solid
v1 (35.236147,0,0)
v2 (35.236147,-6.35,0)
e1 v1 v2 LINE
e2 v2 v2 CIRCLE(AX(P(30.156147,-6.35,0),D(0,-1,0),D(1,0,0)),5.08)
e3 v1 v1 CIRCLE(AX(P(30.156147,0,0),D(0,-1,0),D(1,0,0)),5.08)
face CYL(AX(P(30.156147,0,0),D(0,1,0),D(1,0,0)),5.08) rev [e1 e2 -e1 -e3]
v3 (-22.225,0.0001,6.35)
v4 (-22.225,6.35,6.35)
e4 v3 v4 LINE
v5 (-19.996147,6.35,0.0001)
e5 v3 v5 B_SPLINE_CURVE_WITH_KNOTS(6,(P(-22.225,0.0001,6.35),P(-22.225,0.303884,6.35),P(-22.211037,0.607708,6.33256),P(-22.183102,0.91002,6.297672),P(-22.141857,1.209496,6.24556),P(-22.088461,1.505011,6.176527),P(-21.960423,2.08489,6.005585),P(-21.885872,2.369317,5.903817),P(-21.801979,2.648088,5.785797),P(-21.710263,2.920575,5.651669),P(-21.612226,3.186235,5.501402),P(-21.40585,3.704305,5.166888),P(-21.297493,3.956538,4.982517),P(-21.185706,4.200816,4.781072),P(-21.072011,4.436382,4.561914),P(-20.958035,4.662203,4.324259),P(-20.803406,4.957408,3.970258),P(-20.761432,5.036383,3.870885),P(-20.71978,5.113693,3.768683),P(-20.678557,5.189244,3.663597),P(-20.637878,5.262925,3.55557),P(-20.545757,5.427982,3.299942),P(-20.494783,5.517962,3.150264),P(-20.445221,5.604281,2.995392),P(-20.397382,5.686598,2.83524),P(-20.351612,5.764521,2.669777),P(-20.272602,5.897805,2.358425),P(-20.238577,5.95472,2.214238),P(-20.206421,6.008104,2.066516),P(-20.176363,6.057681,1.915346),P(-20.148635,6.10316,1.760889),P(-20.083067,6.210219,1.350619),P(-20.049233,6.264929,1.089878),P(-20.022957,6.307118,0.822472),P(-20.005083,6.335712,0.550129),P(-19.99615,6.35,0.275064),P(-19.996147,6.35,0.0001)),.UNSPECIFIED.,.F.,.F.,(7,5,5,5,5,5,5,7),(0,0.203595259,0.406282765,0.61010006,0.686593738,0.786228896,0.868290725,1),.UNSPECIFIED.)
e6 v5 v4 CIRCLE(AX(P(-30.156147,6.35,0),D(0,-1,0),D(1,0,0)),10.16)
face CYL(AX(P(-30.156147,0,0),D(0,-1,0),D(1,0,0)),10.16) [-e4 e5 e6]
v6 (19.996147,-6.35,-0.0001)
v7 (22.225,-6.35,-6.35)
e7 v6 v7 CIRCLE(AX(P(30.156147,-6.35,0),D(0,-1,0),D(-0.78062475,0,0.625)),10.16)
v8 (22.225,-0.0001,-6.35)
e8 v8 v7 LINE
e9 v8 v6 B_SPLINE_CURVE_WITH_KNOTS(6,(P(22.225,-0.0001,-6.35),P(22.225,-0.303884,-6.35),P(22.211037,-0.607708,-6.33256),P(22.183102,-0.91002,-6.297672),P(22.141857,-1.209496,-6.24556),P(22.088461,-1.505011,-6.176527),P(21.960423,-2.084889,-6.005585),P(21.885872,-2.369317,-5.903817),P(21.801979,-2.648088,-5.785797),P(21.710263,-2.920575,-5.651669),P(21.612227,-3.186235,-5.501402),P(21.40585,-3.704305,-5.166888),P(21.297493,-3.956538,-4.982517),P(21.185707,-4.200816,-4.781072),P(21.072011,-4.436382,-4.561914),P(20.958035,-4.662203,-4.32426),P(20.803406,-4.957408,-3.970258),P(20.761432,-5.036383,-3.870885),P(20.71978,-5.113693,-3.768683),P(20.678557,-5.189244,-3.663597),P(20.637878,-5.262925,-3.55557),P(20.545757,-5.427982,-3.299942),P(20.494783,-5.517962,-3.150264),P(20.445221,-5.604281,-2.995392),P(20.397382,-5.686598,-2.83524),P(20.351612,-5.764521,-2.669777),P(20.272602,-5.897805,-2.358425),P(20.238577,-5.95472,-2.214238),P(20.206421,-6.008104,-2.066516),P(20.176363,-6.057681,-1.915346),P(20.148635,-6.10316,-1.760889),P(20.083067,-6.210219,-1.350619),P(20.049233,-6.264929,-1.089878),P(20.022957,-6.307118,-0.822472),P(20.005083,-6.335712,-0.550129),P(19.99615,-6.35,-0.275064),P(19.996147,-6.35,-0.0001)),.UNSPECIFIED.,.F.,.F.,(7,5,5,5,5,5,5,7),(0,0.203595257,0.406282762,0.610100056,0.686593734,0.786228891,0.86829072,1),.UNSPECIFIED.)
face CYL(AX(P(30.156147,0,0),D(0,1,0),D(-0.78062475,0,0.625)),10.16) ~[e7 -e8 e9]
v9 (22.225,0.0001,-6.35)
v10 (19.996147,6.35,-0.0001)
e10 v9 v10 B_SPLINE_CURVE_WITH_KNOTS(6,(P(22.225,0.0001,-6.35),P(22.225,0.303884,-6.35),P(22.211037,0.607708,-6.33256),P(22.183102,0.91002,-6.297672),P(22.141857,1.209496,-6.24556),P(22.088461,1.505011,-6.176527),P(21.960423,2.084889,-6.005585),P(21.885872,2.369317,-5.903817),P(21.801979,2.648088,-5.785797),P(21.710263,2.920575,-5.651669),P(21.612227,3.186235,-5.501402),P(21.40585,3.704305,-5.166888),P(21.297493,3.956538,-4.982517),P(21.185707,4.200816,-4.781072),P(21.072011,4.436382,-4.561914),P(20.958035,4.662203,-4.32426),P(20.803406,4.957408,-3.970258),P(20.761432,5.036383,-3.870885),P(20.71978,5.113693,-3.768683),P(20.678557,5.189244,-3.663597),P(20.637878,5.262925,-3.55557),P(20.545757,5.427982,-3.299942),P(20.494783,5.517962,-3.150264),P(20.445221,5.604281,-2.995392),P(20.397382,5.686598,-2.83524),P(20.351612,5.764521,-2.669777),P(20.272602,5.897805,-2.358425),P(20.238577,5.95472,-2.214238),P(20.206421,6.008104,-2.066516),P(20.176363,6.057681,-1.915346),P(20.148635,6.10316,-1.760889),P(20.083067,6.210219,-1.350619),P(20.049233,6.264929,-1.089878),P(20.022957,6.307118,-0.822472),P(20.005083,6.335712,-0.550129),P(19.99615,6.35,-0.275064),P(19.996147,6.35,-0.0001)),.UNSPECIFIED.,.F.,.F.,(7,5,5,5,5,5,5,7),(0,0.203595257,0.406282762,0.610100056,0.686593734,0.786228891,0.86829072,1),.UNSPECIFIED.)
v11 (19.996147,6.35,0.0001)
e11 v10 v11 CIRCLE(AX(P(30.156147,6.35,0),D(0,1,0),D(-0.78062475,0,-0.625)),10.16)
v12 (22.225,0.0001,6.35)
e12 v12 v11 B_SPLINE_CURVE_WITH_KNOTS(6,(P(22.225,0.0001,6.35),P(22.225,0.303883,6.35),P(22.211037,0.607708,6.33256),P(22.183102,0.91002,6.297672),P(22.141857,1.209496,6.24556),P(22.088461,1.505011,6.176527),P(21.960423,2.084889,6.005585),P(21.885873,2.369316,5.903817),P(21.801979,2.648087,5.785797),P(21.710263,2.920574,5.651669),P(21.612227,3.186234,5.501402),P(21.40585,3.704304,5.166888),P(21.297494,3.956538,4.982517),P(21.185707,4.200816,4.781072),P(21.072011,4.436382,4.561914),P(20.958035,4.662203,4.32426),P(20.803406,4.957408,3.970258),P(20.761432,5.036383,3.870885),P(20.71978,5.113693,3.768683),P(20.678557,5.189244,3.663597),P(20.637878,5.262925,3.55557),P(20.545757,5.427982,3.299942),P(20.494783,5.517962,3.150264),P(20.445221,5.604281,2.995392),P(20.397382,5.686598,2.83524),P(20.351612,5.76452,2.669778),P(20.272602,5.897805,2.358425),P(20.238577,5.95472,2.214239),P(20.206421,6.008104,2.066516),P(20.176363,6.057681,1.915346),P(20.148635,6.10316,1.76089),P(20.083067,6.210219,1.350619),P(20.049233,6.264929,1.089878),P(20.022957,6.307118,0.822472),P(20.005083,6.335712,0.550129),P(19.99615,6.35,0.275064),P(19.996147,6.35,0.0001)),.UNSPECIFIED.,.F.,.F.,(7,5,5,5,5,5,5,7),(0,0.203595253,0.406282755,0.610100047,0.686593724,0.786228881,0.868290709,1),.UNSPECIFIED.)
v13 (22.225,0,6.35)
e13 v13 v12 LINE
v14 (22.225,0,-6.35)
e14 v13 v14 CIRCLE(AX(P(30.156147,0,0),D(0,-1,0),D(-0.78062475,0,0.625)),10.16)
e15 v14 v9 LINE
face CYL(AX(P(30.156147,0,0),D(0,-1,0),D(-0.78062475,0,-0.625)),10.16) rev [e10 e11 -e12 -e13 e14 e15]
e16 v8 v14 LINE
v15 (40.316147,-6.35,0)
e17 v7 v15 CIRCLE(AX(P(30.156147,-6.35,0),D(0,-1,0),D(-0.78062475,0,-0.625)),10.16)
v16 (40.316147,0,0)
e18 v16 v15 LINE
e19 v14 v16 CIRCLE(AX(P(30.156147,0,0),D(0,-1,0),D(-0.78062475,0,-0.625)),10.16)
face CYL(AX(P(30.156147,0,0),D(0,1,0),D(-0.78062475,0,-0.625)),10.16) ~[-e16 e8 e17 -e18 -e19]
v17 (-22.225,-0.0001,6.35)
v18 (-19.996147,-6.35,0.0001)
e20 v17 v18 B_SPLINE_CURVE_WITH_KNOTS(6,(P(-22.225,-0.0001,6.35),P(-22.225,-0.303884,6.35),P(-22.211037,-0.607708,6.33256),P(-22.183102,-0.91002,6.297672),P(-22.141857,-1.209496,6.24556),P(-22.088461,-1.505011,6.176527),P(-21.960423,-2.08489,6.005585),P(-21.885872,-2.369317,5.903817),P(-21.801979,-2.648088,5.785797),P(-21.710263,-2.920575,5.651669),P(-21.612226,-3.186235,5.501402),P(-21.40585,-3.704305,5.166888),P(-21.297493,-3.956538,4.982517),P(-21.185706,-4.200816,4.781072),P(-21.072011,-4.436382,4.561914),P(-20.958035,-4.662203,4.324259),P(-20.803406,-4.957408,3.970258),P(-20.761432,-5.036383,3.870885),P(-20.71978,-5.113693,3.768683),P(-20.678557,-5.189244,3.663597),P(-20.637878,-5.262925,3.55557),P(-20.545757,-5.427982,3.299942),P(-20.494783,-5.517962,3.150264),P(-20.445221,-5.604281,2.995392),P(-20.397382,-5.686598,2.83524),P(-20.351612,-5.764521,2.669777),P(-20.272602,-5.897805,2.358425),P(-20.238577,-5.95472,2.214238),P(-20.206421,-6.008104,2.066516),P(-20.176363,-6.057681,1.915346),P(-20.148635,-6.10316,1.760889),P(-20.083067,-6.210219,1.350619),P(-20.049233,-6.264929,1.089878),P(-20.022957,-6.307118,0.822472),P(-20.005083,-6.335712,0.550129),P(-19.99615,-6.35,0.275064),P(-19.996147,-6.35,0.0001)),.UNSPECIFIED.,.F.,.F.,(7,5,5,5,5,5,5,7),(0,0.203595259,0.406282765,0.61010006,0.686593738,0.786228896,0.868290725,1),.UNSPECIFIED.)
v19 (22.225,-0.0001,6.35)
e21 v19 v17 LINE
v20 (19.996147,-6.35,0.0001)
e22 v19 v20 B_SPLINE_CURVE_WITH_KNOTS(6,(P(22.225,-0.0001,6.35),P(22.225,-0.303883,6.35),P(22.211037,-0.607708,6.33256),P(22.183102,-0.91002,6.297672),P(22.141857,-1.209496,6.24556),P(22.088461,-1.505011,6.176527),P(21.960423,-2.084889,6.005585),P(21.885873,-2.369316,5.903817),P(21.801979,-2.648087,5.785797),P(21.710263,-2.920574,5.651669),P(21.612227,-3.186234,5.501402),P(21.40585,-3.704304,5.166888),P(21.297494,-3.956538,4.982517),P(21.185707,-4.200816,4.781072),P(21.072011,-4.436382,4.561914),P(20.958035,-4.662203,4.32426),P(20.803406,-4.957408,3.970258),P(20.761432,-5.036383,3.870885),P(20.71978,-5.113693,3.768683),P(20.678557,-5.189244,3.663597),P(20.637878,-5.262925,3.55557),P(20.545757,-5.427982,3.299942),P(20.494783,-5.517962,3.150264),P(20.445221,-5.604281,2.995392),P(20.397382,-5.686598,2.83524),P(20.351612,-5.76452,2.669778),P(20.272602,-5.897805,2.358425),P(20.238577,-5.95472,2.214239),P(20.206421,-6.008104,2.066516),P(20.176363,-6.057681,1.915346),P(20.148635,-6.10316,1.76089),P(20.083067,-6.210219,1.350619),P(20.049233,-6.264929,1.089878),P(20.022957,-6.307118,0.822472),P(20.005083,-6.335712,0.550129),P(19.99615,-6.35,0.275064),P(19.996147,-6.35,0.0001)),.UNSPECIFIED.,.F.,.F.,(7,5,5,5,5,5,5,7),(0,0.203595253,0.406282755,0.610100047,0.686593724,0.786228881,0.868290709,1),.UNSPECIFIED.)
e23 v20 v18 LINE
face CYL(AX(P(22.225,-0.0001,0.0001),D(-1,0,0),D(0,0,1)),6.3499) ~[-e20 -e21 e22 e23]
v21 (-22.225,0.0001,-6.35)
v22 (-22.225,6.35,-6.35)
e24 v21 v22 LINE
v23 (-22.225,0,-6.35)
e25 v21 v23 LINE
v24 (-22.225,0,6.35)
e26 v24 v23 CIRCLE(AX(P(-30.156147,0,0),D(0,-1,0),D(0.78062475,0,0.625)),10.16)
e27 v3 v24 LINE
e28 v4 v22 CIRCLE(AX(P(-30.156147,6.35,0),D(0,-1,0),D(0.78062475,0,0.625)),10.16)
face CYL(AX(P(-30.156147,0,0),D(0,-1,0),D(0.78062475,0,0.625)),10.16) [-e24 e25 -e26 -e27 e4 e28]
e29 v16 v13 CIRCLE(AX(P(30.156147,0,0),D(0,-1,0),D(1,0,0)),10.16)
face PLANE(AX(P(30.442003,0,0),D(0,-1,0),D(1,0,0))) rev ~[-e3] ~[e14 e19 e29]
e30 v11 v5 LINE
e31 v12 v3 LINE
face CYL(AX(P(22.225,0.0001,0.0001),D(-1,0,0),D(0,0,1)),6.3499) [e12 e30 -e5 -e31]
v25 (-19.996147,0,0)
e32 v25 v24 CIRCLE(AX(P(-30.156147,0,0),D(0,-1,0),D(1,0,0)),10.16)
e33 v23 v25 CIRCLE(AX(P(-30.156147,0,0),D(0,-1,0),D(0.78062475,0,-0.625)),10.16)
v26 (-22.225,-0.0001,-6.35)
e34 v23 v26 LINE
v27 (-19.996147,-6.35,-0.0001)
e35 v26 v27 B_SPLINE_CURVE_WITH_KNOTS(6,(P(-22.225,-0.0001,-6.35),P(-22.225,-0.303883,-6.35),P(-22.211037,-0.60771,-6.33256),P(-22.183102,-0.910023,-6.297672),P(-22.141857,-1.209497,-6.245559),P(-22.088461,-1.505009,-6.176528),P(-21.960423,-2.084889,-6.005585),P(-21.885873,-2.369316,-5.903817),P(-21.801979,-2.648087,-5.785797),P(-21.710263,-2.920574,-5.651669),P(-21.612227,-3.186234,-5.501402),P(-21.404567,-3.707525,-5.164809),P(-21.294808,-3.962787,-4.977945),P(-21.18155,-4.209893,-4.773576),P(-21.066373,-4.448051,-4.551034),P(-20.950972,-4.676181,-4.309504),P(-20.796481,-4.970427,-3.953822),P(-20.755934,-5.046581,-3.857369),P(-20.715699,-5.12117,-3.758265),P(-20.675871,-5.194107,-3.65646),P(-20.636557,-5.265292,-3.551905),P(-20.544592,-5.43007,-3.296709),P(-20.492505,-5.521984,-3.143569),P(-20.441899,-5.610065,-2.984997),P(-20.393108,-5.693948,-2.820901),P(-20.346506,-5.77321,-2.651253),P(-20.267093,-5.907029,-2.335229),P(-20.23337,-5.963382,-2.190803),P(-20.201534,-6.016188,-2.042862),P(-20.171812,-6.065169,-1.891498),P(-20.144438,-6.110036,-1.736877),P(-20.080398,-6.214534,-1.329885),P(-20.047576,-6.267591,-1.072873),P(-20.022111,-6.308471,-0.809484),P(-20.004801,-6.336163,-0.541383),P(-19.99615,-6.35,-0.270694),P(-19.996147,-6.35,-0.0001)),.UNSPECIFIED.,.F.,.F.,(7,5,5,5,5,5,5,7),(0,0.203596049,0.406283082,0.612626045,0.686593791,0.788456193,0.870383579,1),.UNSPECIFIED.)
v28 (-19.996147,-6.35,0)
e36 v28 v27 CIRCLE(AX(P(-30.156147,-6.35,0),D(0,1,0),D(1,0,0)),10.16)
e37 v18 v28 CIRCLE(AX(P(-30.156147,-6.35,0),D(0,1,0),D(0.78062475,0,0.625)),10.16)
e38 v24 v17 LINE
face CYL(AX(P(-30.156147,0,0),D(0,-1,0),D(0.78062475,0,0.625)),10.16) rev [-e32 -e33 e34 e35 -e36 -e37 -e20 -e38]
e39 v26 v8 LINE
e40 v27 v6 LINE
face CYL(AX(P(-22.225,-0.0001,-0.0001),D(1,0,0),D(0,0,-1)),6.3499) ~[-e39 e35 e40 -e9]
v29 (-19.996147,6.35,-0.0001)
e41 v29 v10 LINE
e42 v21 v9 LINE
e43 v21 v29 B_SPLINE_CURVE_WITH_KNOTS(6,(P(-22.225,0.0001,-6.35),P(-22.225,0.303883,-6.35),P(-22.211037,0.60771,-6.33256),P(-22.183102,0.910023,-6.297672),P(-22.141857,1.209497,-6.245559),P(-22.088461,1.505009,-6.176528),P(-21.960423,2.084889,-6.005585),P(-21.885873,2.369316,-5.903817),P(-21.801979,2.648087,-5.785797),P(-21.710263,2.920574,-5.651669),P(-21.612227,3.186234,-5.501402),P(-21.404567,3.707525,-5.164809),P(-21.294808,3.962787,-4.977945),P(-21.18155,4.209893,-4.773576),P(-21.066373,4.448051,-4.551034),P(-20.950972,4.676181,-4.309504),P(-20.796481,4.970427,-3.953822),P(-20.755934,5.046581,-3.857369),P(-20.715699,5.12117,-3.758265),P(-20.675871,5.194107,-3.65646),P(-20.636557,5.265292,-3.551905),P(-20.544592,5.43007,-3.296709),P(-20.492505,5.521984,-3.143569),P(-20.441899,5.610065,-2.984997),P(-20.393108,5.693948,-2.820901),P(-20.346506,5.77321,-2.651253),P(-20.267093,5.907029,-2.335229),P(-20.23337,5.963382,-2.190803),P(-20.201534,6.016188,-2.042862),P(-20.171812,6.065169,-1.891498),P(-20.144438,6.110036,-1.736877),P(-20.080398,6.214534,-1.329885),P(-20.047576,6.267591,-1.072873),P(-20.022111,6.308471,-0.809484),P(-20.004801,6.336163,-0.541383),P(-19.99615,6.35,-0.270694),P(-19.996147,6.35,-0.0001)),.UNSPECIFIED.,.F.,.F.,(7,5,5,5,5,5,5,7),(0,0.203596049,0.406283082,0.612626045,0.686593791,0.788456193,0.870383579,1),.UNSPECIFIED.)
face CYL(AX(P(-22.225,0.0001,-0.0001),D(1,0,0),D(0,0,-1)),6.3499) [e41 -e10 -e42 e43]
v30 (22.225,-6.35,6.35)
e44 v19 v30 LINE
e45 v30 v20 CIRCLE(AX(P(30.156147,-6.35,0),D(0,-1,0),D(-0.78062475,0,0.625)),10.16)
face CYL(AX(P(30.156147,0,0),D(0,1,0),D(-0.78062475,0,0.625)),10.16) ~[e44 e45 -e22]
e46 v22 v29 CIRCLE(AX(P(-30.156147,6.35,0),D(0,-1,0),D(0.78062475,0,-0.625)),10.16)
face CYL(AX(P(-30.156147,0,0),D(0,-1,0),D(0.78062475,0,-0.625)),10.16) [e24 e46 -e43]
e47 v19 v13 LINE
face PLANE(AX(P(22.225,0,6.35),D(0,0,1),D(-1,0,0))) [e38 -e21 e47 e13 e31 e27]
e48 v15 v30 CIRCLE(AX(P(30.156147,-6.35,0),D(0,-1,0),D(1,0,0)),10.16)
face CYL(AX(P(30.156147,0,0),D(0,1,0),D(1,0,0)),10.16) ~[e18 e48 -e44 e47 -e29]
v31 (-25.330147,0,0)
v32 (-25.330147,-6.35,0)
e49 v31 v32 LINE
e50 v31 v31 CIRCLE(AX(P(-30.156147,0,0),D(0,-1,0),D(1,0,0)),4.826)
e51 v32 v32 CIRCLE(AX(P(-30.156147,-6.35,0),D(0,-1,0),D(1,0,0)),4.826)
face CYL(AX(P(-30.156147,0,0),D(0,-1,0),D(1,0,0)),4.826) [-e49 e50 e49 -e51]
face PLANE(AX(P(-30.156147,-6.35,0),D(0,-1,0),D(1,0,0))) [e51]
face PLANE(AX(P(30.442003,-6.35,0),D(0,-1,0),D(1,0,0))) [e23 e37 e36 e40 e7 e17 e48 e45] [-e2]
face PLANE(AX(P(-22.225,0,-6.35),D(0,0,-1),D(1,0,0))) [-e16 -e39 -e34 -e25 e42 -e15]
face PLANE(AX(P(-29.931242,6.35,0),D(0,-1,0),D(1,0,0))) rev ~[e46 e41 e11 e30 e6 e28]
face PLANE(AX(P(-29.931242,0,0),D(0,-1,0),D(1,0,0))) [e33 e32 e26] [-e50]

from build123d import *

# Parameters (mm, degrees)
F1_DEPTH = 6.35
F2_R     = 6.3499
F0_R     = 5.08
F3_DEPTH = 6.35
F0_R_2   = 4.826
F4_DEPTH = 6.35
F5_DEPTH = 6.35


# Not quite as in the source:
# - a fillet or chamfer is up to 0.001 mm smaller than in the source, because OpenCascade refuses the exact size


with BuildPart() as f1:
    # F0 (on Front) → F1 (new body, symmetric)
    with BuildSketch(Plane.XZ):
        with BuildLine():
            Line((22.225, 6.35), (-22.225, 6.35))
            ThreePointArc((-22.225, 6.35), (-20.5695407024, 3.3649028089), (-19.996147458, 0))
            ThreePointArc((-19.996147458, 0), (-20.5695407024, -3.3649028089), (-22.225, -6.35))
            Line((-22.225, -6.35), (22.225, -6.35))
            ThreePointArc((22.225, -6.35), (19.996147458, 0), (22.225, 6.35))
        make_face()
    extrude(amount=F1_DEPTH, both=True)

    # F2 (radius 6.35 in the source; OpenCascade refuses exactly that, so slightly less here)
    f2_edges = [f1.edges().sort_by_distance(p)[0] for p in [
        (0, -6.35, 6.35),
        (0, 6.35, 6.35),
        (0, -6.35, -6.35),
        (0, 6.35, -6.35),
    ]]
    fillet(f2_edges, radius=F2_R)

    # F0 (on Front) → F3 (join)
    with BuildSketch(Plane.XZ):
        with BuildLine():
            ThreePointArc((40.316147458, 0), (33.5210502669, 9.5866067556), (22.225, 6.35))
            Line((22.225, 6.35), (22.225, -6.35))
            ThreePointArc((22.225, -6.35), (33.5210502669, -9.5866067556), (40.316147458, 0))
        make_face()
        with Locations((30.156147458, 0)):
            Circle(F0_R, mode=Mode.SUBTRACT)
        with BuildLine():
            Line((22.225, -6.35), (22.225, 6.35))
            ThreePointArc((22.225, 6.35), (19.996147458, 0), (22.225, -6.35))
        make_face()
    extrude(amount=F3_DEPTH)

    # F0 (on Front) → F4 (join)
    with BuildSketch(Plane.XZ):
        with BuildLine():
            Line((-22.225, -6.35), (-22.225, 6.35))
            ThreePointArc((-22.225, 6.35), (-40.316147458, 0), (-22.225, -6.35))
        make_face()
        with Locations((-30.156147458, 0)):
            Circle(F0_R_2, mode=Mode.SUBTRACT)
        with BuildLine():
            ThreePointArc((-19.996147458, 0), (-20.5695407024, 3.3649028089), (-22.225, 6.35))
            Line((-22.225, 6.35), (-22.225, -6.35))
            ThreePointArc((-22.225, -6.35), (-20.5695407024, -3.3649028089), (-19.996147458, 0))
        make_face()
    extrude(amount=-F4_DEPTH)

    # F0 (on Front) → F5 (join, symmetric)
    with BuildSketch(Plane.XZ):
        with Locations((-30.156147458, 0)):
            Circle(F0_R_2)
    extrude(amount=F5_DEPTH, both=True)


solid = f1.part
